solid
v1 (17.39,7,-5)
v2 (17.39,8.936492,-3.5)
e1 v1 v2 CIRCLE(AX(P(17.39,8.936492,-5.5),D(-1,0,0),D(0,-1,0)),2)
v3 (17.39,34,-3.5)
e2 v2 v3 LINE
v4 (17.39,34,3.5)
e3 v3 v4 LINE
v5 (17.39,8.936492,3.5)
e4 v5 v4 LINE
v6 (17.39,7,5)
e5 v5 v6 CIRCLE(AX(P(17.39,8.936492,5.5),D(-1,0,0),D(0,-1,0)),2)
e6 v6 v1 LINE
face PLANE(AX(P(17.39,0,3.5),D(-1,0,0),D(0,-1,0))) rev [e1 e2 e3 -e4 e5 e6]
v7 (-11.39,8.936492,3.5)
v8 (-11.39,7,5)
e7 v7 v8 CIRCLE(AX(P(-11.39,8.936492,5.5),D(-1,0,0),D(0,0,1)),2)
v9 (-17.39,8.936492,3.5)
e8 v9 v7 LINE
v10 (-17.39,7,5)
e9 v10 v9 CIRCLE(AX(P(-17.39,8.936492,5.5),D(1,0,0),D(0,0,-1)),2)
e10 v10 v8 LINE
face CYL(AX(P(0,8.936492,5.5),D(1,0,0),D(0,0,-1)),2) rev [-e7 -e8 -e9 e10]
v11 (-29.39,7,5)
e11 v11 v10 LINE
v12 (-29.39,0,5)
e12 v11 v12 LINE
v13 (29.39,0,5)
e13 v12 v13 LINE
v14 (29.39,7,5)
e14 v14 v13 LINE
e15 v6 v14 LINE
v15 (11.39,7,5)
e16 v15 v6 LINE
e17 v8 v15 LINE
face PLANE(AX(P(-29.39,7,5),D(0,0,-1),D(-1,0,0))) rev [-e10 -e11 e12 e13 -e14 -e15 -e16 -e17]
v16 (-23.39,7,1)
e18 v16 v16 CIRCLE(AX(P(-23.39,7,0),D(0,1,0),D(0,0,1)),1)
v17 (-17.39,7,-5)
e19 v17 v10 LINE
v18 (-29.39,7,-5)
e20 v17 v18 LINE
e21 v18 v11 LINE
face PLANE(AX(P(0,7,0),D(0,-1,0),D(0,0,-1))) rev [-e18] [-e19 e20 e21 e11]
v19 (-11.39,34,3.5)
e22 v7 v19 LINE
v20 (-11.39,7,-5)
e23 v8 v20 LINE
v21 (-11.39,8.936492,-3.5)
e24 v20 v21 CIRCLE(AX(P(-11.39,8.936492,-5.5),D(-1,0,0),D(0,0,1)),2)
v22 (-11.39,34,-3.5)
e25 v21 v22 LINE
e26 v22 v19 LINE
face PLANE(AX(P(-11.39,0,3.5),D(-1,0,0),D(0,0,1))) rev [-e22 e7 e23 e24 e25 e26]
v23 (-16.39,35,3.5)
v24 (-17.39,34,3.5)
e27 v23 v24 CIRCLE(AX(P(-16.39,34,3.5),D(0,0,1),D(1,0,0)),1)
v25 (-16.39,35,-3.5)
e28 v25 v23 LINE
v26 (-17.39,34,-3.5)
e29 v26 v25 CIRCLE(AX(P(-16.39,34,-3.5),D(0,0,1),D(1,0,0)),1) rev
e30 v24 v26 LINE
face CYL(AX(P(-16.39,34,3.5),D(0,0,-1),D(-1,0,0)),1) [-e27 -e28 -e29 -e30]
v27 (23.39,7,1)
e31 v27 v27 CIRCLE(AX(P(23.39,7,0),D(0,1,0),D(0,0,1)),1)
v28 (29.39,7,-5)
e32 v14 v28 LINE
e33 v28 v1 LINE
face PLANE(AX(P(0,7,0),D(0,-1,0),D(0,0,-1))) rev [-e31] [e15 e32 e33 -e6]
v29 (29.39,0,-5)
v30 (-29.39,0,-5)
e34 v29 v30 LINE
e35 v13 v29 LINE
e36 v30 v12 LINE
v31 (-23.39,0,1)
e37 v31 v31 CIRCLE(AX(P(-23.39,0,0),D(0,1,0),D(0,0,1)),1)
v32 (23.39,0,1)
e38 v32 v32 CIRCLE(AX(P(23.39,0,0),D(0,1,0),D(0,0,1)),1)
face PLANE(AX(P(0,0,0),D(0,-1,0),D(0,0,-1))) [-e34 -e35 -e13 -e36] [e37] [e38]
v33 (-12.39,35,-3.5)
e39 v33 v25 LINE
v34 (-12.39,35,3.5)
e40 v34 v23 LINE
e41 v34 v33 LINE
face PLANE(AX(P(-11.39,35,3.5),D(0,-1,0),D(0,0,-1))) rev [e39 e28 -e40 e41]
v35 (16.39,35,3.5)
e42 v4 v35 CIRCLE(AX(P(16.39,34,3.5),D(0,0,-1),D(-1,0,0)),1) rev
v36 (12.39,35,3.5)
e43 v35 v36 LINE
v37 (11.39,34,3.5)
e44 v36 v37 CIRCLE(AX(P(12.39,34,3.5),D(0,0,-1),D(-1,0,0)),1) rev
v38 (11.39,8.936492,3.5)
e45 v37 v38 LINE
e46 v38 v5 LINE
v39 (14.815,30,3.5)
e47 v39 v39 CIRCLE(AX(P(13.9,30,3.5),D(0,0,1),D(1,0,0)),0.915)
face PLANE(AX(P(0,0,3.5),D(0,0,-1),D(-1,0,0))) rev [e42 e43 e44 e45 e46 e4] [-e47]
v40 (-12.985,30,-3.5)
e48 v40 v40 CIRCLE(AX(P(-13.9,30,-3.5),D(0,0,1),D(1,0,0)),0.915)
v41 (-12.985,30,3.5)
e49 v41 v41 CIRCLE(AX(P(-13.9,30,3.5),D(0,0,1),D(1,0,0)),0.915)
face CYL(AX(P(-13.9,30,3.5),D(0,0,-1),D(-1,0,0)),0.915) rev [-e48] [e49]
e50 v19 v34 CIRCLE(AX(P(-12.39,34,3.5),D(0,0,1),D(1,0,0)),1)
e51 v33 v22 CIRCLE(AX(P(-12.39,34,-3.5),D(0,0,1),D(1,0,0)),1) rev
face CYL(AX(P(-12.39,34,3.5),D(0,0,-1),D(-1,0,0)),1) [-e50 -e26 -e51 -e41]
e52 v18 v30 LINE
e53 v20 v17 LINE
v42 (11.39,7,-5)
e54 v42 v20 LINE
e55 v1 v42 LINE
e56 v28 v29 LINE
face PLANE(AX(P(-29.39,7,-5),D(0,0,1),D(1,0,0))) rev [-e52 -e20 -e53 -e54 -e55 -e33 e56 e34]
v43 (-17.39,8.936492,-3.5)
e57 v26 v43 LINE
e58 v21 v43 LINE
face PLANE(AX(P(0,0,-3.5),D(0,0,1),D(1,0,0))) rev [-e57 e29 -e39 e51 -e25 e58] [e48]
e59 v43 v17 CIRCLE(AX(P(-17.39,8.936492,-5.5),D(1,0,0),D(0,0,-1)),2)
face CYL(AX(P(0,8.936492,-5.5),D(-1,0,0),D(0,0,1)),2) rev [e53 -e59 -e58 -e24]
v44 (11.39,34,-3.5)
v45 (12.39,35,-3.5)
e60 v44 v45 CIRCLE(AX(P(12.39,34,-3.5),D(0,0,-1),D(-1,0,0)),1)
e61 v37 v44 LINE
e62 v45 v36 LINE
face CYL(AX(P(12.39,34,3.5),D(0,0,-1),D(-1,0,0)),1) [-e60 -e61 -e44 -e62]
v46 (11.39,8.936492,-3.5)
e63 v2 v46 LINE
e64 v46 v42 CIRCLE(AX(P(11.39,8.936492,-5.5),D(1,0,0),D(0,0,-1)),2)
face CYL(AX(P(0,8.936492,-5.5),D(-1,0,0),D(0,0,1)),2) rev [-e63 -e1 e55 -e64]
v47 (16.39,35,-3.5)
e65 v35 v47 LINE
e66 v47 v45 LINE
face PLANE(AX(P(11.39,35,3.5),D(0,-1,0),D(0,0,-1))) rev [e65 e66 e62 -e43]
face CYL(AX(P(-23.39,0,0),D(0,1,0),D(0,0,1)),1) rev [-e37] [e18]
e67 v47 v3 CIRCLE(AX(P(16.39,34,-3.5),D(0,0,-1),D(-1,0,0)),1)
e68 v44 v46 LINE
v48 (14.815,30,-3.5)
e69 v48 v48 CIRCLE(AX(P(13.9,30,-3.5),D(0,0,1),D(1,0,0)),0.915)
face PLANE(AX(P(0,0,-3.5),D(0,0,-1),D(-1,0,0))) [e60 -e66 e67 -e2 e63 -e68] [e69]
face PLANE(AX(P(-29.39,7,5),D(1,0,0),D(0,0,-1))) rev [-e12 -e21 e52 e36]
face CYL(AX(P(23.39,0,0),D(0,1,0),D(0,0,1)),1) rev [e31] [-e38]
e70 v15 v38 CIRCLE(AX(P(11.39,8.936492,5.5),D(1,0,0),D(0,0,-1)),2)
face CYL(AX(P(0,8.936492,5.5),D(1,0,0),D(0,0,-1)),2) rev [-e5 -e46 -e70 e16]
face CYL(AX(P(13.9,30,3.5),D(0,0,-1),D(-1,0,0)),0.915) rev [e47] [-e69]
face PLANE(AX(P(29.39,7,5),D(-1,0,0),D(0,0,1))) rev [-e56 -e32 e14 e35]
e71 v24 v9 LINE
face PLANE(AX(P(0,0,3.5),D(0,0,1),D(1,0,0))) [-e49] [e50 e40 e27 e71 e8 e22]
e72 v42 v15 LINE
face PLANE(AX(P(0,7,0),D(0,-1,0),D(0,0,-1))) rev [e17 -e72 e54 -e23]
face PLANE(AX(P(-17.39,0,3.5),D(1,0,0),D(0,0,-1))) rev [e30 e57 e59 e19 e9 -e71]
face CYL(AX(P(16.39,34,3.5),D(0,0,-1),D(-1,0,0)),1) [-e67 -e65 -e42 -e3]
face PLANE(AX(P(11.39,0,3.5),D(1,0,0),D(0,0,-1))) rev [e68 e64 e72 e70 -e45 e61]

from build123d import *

# Parameters (mm, degrees)
SKETCH1_W         = 58.78
SKETCH1_H         = 10
BASE_DEPTH        = 7
SKETCH4_W         = 6
SKETCH4_H         = 35
SKETCH4_R         = 0.915
FLANGE_DEPTH      = 3.5
HOLE_R            = 1
BOTTOM_HOLE_DEPTH = 7
BOTTOM_FILLET_R   = 2
TOP_FILLET_R      = 1


with BuildPart() as part:
    # Sketch1 → Base (new body)
    with BuildSketch(Plane(origin=(0, 0, 0), x_dir=(1, 0, 0), z_dir=(0, 1, 0))):
        Rectangle(SKETCH1_W, SKETCH1_H)
    extrude(amount=BASE_DEPTH)

    # Sketch4 → Flange (add, symmetric)
    # profile 1 of 2: a face of its own
    with BuildSketch(Plane.XY):
        with Locations((-14.39, 17.5)):
            Rectangle(SKETCH4_W, SKETCH4_H)
        with Locations((-13.9, 30)):
            Circle(SKETCH4_R, mode=Mode.SUBTRACT)
    # profile 2 of 2: a face of its own
    with BuildSketch(Plane.XY):
        with Locations((14.39, 17.5)):
            Rectangle(SKETCH4_W, SKETCH4_H)
        with Locations((13.9, 30)):
            Circle(SKETCH4_R, mode=Mode.SUBTRACT)
    extrude(amount=FLANGE_DEPTH, both=True)

    # Hole → Bottom Hole (cut)
    with BuildSketch(Plane(origin=(0, 7, 0), x_dir=(1, 0, 0), z_dir=(0, 1, 0))):
        with Locations(Location((-23.39, 0, 0), (0, 0, 270))):
            Circle(HOLE_R)
        with Locations(Location((23.39, 0, 0), (0, 0, 270))):
            Circle(HOLE_R)
    extrude(amount=-BOTTOM_HOLE_DEPTH, mode=Mode.SUBTRACT)

    # Bottom Fillet
    # the kernel refuses this fillet: 2 mm, written as the material it adds along each edge
    with BuildSketch(Plane(origin=(-11.39, 7, -3.5), x_dir=(0, 0, -1), z_dir=(-1, 0, 0)), Plane(origin=(11.39, 7, 3.5), x_dir=(0, 0, 1), z_dir=(1, 0, 0))) as bottom_fillet_piece_1:
        with BuildLine():
            CenterArc((2, -1.936491673), BOTTOM_FILLET_R, 104.477512186, 75.522487814)
            Line((0, -1.936491673), (-0.04, -1.936491673))
            Line((-0.04, -1.936491673), (-0.04, 0))
            Line((-0.04, 0), (0, 0.04))
            ThreePointArc((0, 0.04), (0.75, 0.04), (1.49, 0.038729833))
            Line((1.49, 0.038729833), (1.5, 0))
        make_face()
    extrude(amount=6)
    with BuildSketch(Plane(origin=(-11.39, 7, 3.5), x_dir=(0, 0, 1), z_dir=(-1, 0, 0)), Plane(origin=(11.39, 7, -3.5), x_dir=(0, 0, -1), z_dir=(1, 0, 0))) as bottom_fillet_piece_2:
        with BuildLine():
            CenterArc((2, 1.936491673), BOTTOM_FILLET_R, 180, 75.522487814)
            Line((0, 1.936491673), (-0.04, 1.936491673))
            Line((-0.04, 1.936491673), (-0.04, 0))
            Line((-0.04, 0), (0, -0.04))
            ThreePointArc((0, -0.04), (0.75, -0.04), (1.49, -0.038729833))
            Line((1.49, -0.038729833), (1.5, 0))
        make_face()
    extrude(amount=6)

    # Top Fillet
    top_fillet_edges = [part.edges().sort_by_distance(p)[0] for p in [
        (-17.39, 35, 0),
        (-11.39, 35, 0),
        (11.39, 35, 0),
        (17.39, 35, 0),
    ]]
    fillet(top_fillet_edges, radius=TOP_FILLET_R)


solid = part.part
